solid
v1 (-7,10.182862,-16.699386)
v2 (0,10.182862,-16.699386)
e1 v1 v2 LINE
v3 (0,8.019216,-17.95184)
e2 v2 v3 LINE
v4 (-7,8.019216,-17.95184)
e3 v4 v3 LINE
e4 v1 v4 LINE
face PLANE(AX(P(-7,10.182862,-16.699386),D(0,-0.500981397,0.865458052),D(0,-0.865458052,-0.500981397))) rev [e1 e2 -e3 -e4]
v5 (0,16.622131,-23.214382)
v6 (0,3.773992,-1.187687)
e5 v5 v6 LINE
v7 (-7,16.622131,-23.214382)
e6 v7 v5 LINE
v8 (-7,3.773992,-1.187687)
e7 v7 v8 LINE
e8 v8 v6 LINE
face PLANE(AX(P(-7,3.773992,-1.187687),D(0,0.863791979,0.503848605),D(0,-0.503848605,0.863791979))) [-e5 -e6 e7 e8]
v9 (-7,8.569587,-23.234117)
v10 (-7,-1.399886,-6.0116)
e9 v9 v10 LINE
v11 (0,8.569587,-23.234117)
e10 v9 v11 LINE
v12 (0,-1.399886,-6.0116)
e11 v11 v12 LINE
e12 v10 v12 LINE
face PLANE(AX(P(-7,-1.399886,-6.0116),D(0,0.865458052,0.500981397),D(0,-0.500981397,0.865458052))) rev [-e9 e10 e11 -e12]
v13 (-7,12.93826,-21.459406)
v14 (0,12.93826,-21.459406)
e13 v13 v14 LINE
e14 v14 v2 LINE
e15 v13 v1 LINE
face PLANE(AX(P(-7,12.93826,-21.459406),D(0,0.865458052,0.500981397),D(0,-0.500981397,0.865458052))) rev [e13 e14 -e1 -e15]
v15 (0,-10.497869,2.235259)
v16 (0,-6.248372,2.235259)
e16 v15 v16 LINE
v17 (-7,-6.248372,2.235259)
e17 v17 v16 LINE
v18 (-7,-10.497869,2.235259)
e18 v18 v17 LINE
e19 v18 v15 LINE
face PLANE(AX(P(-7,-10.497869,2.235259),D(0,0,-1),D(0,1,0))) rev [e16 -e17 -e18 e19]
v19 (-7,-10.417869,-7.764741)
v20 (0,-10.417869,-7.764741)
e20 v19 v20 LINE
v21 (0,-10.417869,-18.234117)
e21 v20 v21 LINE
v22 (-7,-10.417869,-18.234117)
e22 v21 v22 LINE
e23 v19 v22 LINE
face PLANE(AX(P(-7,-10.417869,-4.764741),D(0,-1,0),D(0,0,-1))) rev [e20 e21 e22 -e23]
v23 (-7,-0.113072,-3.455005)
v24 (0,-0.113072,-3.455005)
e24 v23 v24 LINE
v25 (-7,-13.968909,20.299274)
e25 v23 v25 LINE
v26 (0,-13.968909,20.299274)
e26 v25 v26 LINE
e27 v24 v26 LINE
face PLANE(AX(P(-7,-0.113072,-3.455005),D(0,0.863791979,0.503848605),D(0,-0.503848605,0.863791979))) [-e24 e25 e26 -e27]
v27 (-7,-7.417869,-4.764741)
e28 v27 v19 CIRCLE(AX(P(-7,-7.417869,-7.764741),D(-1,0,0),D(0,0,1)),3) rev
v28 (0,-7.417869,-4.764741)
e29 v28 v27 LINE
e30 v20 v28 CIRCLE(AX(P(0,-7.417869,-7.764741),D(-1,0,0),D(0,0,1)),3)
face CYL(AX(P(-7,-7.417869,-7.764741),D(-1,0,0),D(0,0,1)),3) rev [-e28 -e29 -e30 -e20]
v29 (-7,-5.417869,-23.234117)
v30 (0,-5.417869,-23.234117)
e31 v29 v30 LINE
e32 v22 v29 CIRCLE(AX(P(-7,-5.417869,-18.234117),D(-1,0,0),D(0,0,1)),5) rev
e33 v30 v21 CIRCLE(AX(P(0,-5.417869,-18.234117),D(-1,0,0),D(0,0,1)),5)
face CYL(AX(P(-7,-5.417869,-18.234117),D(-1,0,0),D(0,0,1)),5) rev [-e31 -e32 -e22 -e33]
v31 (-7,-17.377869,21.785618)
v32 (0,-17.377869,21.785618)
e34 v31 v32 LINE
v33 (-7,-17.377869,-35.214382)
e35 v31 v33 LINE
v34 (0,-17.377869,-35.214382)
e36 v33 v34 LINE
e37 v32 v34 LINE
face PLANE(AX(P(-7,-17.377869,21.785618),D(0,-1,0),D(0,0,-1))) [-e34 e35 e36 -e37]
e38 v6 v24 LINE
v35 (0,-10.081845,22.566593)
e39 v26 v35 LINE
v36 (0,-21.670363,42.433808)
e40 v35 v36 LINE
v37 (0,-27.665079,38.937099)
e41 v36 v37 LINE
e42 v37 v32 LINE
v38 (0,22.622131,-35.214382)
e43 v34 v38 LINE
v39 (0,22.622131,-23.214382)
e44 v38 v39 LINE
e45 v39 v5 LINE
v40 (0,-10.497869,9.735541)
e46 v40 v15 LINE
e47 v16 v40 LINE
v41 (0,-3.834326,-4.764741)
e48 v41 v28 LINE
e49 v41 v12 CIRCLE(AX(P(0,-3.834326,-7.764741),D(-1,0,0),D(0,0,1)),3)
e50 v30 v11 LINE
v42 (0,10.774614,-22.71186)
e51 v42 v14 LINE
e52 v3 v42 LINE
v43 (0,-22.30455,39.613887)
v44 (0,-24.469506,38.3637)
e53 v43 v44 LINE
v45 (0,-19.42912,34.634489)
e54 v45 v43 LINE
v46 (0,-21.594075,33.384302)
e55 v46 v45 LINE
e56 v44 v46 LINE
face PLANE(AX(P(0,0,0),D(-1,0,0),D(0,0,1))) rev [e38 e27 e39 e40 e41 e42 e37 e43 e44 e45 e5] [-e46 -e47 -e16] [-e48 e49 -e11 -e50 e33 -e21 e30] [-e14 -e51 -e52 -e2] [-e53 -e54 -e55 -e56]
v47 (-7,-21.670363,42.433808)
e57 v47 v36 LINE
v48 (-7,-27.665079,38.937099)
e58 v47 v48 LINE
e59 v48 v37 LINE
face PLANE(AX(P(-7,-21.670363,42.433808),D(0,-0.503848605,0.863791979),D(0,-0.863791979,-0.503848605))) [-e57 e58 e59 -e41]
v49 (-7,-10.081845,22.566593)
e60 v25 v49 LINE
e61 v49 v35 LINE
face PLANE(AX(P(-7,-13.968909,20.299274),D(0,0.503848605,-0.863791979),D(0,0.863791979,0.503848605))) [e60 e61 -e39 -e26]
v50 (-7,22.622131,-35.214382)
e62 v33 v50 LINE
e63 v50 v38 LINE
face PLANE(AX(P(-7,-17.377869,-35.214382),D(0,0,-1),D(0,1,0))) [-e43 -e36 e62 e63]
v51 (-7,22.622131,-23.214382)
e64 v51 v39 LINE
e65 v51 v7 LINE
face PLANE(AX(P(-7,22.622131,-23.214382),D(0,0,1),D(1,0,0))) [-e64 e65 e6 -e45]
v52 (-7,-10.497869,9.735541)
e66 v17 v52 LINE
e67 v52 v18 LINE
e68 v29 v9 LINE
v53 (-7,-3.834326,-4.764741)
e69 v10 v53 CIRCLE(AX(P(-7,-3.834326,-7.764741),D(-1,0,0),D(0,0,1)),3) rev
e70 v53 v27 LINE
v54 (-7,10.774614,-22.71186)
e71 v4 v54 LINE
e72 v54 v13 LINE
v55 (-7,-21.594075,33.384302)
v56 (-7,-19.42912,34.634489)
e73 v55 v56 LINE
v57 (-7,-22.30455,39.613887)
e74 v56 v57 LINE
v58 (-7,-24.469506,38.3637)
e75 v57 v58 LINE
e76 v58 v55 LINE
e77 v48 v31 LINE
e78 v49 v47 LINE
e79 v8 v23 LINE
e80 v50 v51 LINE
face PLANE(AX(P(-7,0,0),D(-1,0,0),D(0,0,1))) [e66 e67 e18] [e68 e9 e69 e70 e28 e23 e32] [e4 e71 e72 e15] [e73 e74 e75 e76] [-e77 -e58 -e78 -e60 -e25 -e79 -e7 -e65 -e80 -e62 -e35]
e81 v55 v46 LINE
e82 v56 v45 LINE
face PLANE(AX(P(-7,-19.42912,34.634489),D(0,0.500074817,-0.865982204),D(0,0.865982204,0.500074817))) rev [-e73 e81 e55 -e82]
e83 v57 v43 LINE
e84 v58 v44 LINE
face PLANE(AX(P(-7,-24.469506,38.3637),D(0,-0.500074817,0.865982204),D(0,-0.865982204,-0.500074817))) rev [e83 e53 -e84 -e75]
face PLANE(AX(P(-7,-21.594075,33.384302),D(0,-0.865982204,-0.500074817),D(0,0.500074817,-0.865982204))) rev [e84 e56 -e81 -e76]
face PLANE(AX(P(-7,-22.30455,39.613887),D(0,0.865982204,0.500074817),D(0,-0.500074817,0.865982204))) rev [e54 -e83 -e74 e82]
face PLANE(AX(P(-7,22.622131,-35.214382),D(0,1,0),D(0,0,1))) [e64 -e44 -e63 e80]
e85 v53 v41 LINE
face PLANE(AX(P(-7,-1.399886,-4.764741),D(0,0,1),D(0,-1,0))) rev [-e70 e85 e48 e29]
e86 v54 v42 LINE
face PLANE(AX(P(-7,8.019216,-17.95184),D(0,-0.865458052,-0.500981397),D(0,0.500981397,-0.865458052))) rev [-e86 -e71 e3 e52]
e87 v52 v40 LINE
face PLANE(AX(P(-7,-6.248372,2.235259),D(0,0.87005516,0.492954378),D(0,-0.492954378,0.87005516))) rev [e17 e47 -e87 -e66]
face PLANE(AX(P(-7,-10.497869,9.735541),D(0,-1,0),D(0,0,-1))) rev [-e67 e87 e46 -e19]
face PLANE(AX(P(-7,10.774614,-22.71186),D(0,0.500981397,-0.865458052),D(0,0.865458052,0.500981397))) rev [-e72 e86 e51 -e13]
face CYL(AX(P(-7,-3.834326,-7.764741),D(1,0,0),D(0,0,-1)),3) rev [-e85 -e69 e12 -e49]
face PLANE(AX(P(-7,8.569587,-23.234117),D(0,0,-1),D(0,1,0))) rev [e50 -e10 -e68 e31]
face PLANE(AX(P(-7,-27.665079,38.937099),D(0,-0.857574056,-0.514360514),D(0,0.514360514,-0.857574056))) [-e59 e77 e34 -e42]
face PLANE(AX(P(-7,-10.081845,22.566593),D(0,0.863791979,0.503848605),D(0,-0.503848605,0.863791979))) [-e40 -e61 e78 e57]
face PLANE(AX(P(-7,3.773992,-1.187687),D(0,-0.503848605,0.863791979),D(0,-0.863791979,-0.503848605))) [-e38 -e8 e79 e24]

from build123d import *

# Parameters (mm, degrees)
BOSS_EXTRUDE1_DEPTH = 7
FILLET1_R           = 3
FILLET2_R           = 5


with BuildPart() as part:
    # Sketch1 → Boss-Extrude1 (new body)
    with BuildSketch(Plane(origin=(0, 0, 0), x_dir=(0, 0, -1), z_dir=(1, 0, 0))):
        Polygon((-21.785617828, -17.377868865), (35.214382172, -17.377868865), (35.214382172, 22.622131135), (23.214382172, 22.622131135), (23.214382172, 16.622131135), (1.187686697, 3.773991719), (3.455005417, -0.113072189), (-20.299274017, -13.968908814), (-22.566592737, -10.081844907), (-42.433808264, -21.670362811), (-38.937098948, -27.665079148), align=None)
        Polygon((23.234116709, 8.569586546), (23.234116709, -10.417868865), (4.764740561, -10.417868865), (4.764740561, -1.399885987), (6.011600394, -1.399885987), align=None, mode=Mode.SUBTRACT)
        Polygon((-39.613886954, -22.304550046), (-34.634489281, -19.42911985), (-33.384302239, -21.59407536), (-38.363699913, -24.469505556), align=None, mode=Mode.SUBTRACT)
        Polygon((-9.735540794, -10.497868865), (-2.235259439, -10.497868865), (-2.235259439, -6.248372162), align=None, mode=Mode.SUBTRACT)
        Polygon((16.699385829, 10.182861543), (17.951839541, 8.019216032), (22.7118599, 10.774614335), (21.459406188, 12.938259845), align=None, mode=Mode.SUBTRACT)
    extrude(amount=-BOSS_EXTRUDE1_DEPTH)

    # Fillet1
    # the kernel refuses this fillet: 3 mm, written as the material it adds along each edge
    with BuildSketch(Plane(origin=(0, -10.417868865, -4.764740561), x_dir=(0, 0, -1), z_dir=(-1, 0, 0))) as fillet1_piece_1:
        with BuildLine():
            CenterArc((FILLET1_R, -FILLET1_R), FILLET1_R, 90, 90)
            Line((0, -FILLET1_R), (-FILLET1_R * 0.02, -FILLET1_R))
            Line((-FILLET1_R * 0.02, -FILLET1_R), (-FILLET1_R * 0.02, FILLET1_R * 0.02))
            Line((-FILLET1_R * 0.02, FILLET1_R * 0.02), (FILLET1_R, FILLET1_R * 0.02))
            Line((FILLET1_R, FILLET1_R * 0.02), (FILLET1_R, 0))
        make_face()
    extrude(amount=7)
    with BuildSketch(Plane(origin=(0, -1.399885987, -4.764740561), x_dir=(0, -1, 0), z_dir=(-1, 0, 0))) as fillet1_piece_2:
        with BuildLine():
            CenterArc((2.434440295, -3), FILLET1_R, 90, 54.240794128)
            Line((0, -1.246859832), (-0.048688806, -1.211797029))
            ThreePointArc((-0.048688806, -1.211797029), (-0.06, -0.623429916), (-0.06, 0))
            Line((-0.06, 0), (0, 0.06))
            Line((0, 0.06), (2.434440295, 0.06))
            Line((2.434440295, 0.06), (2.434440295, 0))
        make_face()
    extrude(amount=7)

    # Fillet2
    fillet2_edges = [part.edges().sort_by_distance(p)[0] for p in [
        (-3.5, -10.417868865, -23.234116709),
    ]]
    fillet(fillet2_edges, radius=FILLET2_R)


solid = part.part
